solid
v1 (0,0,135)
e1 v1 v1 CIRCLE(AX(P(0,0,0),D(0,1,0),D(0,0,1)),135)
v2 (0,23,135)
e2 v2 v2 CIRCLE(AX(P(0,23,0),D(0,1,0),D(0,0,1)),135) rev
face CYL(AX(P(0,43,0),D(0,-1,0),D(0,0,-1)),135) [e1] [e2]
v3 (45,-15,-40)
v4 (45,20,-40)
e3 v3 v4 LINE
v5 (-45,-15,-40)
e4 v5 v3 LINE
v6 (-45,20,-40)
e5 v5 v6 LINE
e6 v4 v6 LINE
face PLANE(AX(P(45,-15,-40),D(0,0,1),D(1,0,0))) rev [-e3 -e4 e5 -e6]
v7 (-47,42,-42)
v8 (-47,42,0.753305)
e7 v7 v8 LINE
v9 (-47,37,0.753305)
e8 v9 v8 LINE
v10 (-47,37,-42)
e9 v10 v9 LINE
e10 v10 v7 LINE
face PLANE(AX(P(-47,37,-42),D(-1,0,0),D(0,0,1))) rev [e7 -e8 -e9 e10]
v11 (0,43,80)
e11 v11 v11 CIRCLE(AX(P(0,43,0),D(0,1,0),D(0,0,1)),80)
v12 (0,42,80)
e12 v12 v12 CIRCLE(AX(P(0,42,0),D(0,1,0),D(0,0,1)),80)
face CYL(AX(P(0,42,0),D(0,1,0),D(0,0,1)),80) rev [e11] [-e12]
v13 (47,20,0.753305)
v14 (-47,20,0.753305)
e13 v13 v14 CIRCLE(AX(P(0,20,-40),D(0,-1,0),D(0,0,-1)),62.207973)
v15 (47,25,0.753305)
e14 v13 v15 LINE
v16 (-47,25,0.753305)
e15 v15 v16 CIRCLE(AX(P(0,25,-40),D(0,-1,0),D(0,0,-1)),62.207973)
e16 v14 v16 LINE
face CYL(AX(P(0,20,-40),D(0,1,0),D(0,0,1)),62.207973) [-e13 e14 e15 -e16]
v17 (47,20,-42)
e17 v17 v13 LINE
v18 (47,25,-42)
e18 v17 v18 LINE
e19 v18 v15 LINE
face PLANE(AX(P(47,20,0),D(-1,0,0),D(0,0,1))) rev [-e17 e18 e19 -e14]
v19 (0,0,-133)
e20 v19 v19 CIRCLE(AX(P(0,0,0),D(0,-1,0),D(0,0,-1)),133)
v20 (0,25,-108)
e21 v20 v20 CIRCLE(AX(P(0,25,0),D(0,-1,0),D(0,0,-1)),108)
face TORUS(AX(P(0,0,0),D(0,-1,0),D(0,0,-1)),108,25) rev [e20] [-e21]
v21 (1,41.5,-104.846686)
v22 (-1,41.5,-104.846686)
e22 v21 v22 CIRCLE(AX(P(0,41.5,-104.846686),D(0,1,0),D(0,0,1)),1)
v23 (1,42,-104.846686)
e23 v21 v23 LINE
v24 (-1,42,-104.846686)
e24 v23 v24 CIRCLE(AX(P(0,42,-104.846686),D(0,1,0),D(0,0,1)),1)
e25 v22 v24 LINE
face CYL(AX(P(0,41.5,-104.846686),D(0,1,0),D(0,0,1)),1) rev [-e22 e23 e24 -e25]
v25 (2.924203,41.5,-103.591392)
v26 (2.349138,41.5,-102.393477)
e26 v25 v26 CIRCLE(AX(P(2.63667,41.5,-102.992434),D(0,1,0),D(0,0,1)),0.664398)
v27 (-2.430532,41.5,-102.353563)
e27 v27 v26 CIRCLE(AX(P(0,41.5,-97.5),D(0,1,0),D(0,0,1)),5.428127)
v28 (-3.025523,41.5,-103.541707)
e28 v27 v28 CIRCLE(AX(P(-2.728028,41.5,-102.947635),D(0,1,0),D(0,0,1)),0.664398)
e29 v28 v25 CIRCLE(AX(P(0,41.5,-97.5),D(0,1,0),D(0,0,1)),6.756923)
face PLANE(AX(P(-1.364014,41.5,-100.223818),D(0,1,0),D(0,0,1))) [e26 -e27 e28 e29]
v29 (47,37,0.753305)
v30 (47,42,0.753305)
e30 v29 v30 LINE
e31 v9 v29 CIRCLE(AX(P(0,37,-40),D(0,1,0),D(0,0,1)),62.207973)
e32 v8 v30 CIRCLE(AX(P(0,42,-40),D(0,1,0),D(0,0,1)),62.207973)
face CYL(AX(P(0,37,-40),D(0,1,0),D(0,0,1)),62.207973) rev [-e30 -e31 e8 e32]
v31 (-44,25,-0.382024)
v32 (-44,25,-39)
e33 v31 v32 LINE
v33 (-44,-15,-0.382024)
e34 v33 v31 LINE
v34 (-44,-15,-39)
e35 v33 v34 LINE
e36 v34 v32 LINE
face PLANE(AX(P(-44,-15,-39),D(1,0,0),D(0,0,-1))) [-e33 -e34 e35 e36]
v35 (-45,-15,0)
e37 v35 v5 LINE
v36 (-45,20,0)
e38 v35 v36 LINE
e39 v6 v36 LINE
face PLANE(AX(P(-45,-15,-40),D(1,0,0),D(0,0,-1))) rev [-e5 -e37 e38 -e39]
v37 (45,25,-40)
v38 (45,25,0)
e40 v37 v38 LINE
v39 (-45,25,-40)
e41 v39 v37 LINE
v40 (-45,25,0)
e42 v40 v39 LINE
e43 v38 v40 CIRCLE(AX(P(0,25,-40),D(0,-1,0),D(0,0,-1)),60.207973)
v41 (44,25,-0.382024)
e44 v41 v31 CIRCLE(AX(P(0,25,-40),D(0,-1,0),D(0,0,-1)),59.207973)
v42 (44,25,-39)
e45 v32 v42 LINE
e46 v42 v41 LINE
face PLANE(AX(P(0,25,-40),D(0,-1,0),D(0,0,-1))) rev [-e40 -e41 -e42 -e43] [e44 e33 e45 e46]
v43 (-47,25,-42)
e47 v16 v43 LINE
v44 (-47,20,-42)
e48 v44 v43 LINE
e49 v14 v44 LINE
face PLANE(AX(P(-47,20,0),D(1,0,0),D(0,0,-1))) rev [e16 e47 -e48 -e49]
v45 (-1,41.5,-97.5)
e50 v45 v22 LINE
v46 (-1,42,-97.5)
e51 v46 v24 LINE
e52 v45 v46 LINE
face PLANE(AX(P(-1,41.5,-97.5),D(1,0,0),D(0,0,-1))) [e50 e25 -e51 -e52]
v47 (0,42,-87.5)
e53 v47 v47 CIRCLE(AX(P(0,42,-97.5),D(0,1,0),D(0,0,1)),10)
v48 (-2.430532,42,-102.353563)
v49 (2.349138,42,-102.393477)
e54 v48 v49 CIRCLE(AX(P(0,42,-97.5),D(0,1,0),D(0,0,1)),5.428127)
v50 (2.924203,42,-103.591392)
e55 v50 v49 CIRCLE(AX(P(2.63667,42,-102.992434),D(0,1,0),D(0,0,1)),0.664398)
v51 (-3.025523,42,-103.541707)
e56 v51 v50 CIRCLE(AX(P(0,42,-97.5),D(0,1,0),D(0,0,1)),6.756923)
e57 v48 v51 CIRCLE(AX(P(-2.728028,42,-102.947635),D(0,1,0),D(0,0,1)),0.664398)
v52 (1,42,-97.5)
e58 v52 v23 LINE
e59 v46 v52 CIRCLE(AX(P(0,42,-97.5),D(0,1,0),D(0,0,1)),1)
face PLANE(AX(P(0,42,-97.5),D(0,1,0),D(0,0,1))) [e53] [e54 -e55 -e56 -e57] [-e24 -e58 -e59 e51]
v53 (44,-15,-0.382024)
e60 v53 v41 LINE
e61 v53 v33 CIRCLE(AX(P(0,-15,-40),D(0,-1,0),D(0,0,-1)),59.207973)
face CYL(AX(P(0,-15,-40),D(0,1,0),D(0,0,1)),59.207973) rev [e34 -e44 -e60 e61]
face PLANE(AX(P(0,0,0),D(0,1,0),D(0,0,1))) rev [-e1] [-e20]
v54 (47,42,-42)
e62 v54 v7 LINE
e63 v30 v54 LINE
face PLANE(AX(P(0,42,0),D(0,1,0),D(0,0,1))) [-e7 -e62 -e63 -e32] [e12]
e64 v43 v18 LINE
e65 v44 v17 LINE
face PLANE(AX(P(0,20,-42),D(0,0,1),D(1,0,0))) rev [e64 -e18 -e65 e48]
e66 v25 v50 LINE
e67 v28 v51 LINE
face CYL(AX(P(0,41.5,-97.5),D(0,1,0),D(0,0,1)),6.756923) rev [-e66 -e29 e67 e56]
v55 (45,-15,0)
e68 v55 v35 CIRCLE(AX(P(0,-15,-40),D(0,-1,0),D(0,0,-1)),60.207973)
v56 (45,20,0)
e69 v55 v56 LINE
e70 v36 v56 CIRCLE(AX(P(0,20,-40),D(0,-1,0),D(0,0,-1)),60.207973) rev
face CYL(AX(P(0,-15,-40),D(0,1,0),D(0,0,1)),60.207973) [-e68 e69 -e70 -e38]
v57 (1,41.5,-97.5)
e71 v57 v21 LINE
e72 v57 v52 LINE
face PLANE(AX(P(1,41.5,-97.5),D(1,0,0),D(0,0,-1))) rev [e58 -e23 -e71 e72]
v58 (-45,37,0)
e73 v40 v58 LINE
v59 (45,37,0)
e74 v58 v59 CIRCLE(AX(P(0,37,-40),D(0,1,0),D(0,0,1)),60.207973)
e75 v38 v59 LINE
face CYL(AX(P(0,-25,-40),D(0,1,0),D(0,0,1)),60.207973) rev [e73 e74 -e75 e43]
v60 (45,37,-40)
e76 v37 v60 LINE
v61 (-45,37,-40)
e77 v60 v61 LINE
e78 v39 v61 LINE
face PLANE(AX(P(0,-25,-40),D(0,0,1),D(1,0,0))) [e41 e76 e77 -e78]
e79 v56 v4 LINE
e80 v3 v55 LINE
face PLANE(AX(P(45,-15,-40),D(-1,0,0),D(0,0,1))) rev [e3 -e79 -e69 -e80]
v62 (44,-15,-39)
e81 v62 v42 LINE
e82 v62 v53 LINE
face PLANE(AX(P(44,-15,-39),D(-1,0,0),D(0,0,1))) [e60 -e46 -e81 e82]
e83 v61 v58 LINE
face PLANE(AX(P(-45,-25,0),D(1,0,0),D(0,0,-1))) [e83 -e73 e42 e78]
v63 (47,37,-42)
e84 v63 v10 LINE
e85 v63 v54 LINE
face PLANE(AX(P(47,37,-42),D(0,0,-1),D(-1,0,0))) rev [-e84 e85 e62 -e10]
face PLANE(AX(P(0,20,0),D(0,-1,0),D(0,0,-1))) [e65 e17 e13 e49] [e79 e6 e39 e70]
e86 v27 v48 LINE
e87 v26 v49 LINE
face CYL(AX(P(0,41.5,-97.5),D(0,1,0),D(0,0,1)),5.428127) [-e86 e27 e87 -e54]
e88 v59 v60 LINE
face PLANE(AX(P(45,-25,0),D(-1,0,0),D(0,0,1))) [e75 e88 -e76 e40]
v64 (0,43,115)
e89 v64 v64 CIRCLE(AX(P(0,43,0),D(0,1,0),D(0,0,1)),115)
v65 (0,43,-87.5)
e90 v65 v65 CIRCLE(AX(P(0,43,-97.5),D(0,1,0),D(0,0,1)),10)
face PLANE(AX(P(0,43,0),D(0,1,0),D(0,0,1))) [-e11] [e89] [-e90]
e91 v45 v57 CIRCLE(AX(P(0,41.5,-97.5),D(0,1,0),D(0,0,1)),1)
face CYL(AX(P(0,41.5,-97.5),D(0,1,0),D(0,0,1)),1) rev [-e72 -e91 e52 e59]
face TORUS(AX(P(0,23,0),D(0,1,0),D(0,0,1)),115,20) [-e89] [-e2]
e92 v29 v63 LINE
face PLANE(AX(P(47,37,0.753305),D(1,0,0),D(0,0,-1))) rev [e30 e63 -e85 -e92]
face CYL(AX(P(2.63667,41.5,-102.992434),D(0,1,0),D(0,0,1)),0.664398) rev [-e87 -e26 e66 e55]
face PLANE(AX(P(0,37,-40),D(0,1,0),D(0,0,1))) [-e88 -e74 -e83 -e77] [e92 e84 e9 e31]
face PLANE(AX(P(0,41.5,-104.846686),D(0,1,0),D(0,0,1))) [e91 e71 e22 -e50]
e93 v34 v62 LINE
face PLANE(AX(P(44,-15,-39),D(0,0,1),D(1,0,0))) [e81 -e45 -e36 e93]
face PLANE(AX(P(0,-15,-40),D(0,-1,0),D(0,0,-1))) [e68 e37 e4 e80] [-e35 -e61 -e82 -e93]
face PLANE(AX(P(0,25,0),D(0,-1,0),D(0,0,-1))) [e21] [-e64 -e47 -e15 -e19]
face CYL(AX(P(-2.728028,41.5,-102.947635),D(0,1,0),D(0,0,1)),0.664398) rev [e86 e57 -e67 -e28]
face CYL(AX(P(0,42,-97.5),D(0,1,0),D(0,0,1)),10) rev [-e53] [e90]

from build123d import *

# Parameters (mm, degrees)
CROQUIS1_R              = 135
SALIENTE_EXTRUIR1_DEPTH = 43
REDONDEO5_R             = 20
CROQUIS2_R              = 133
CORTAR_EXTRUIR6_DEPTH   = 25
REDONDEO6_R             = 25
CROQUIS4_R              = 80
CORTAR_EXTRUIR7_DEPTH   = 1
CORTAR_EXTRUIR8_DEPTH   = 67
CROQUIS6_R              = 10
CORTAR_EXTRUIR9_DEPTH   = 1
CORTAR_EXTRUIR10_DEPTH  = 0.5
SALIENTE_EXTRUIR3_DEPTH = 40
SALIENTE_EXTRUIR4_DEPTH = 5
CORTAR_EXTRUIR11_DEPTH  = 5


with BuildPart() as part:
    # Croquis1 → Saliente-Extruir1 (new body)
    with BuildSketch(Plane(origin=(0, 0, 0), x_dir=(1, 0, 0), z_dir=(0, 1, 0))):
        with Locations(Location((0, 0, 0), (0, 0, 270))):
            Circle(CROQUIS1_R)
    extrude(amount=SALIENTE_EXTRUIR1_DEPTH)

    # Redondeo5
    redondeo5_edges = [part.edges().sort_by_distance(p)[0] for p in [
        (0, 43, -135),
    ]]
    fillet(redondeo5_edges, radius=REDONDEO5_R)

    # Croquis2 → Cortar-Extruir6 (cut)
    with BuildSketch(Plane(origin=(0, 0, 0), x_dir=(-1, 0, 0), z_dir=(0, -1, 0))):
        with Locations(Location((0, 0, 0), (0, 0, 90))):
            Circle(CROQUIS2_R)
    extrude(amount=-CORTAR_EXTRUIR6_DEPTH, mode=Mode.SUBTRACT)

    # Redondeo6
    redondeo6_edges = [part.edges().sort_by_distance(p)[0] for p in [
        (0, 25, 133),
    ]]
    fillet(redondeo6_edges, radius=REDONDEO6_R - 0.0001)  # a hair under: the kernel refuses the full size

    # Croquis4 → Cortar-Extruir7 (cut)
    with BuildSketch(Plane(origin=(0, 43, 0), x_dir=(1, 0, 0), z_dir=(0, 1, 0))):
        with Locations(Location((0, 0, 0), (0, 0, 270))):
            Circle(CROQUIS4_R)
    extrude(amount=-CORTAR_EXTRUIR7_DEPTH, mode=Mode.SUBTRACT)

    # Croquis5 → Cortar-Extruir8 (cut)
    with BuildSketch(Plane(origin=(0, 42, 0), x_dir=(1, 0, 0), z_dir=(0, 1, 0))):
        with BuildLine():
            Line((-45, 0), (-45, 40))
            Line((-45, 40), (45, 40))
            Line((45, 40), (45, 0))
            ThreePointArc((45, 0), (0, -20.207972894), (-45, 0))
        make_face()
    extrude(amount=-CORTAR_EXTRUIR8_DEPTH, mode=Mode.SUBTRACT)

    # Croquis6 → Cortar-Extruir9 (cut)
    with BuildSketch(Plane(origin=(0, 43, 0), x_dir=(1, 0, 0), z_dir=(0, 1, 0))):
        with Locations(Location((0, 97.5, 0), (0, 0, 270))):
            Circle(CROQUIS6_R)
    extrude(amount=-CORTAR_EXTRUIR9_DEPTH, mode=Mode.SUBTRACT)

    # Croquis7 → Cortar-Extruir10 (cut)
    with BuildSketch(Plane(origin=(0, 42, 0), x_dir=(1, 0, 0), z_dir=(0, 1, 0))):
        with BuildLine():
            Line((-1, 97.5), (-1, 104.846686009))
            ThreePointArc((-1, 104.846686009), (0, 105.846686009), (1, 104.846686009))
            Line((1, 104.846686009), (1, 97.5))
            ThreePointArc((1, 97.5), (0, 96.5), (-1, 97.5))
        make_face()
        with BuildLine():
            ThreePointArc((-3.025522609, 103.54170716), (0.056423139, 90.743312284), (2.924202621, 103.591391589))
            ThreePointArc((2.924202621, 103.591391589), (2.037712876, 103.279966687), (2.349137778, 102.393476942))
            ThreePointArc((2.349137778, 102.393476942), (0.045327135, 92.072062056), (-2.430532483, 102.353563302))
            ThreePointArc((-2.430532483, 102.353563302), (-2.133955617, 103.245130294), (-3.025522609, 103.54170716))
        make_face()
    extrude(amount=-CORTAR_EXTRUIR10_DEPTH, mode=Mode.SUBTRACT)



with BuildPart() as body_2:
    # Croquis9 → Saliente-Extruir3 (new body)
    with BuildSketch(Plane.XZ.offset(-25)):
        with BuildLine():
            Line((45, -40), (-45, -40))
            Line((-45, -40), (-45, 0))
            ThreePointArc((-45, 0), (0, 20.207972894), (45, 0))
            Line((45, 0), (45, -40))
        make_face()
        with BuildLine():
            Line((44, -39), (-44, -39))
            Line((-44, -39), (-44, -0.382023598))
            ThreePointArc((-44, -0.382023598), (0, 19.207972894), (44, -0.382023598))
            Line((44, -0.382023598), (44, -39))
        make_face(mode=Mode.SUBTRACT)
    extrude(amount=SALIENTE_EXTRUIR3_DEPTH)


with BuildPart() as part_1:
    add(part.part)

    add(body_2.part)  # Saliente-Extruir4 merges body 2
    # Croquis11 → Saliente-Extruir4 (add)
    with BuildSketch(Plane.XZ.offset(-25)):
        with BuildLine():
            Line((47, -42), (47, 0.753305284))
            ThreePointArc((47, 0.753305284), (0, 22.207972894), (-47, 0.753305284))
            Line((-47, 0.753305284), (-47, -42))
            Line((-47, -42), (47, -42))
        make_face()
        with BuildLine():
            Line((45, 0), (45, -40))
            Line((45, -40), (-45, -40))
            Line((-45, -40), (-45, 0))
            ThreePointArc((-45, 0), (0, 20.207972894), (45, 0))
        make_face(mode=Mode.SUBTRACT)
    extrude(amount=SALIENTE_EXTRUIR4_DEPTH)

    # Croquis12 → Cortar-Extruir11 (cut)
    with BuildSketch(Plane(origin=(0, 42, 0), x_dir=(1, 0, 0), z_dir=(0, 1, 0))):
        with BuildLine():
            Line((47, -0.753305284), (47, 42))
            Line((47, 42), (-47, 42))
            Line((-47, 42), (-47, -0.753305284))
            ThreePointArc((-47, -0.753305284), (0, -22.207972894), (47, -0.753305284))
        make_face()
        with BuildLine():
            Line((45, 40), (-45, 40))
            Line((-45, 40), (-45, 0))
            ThreePointArc((-45, 0), (0, -20.207972894), (45, 0))
            Line((45, 0), (45, 40))
        make_face(mode=Mode.SUBTRACT)
    extrude(amount=-CORTAR_EXTRUIR11_DEPTH, mode=Mode.SUBTRACT)


solid = part_1.part
